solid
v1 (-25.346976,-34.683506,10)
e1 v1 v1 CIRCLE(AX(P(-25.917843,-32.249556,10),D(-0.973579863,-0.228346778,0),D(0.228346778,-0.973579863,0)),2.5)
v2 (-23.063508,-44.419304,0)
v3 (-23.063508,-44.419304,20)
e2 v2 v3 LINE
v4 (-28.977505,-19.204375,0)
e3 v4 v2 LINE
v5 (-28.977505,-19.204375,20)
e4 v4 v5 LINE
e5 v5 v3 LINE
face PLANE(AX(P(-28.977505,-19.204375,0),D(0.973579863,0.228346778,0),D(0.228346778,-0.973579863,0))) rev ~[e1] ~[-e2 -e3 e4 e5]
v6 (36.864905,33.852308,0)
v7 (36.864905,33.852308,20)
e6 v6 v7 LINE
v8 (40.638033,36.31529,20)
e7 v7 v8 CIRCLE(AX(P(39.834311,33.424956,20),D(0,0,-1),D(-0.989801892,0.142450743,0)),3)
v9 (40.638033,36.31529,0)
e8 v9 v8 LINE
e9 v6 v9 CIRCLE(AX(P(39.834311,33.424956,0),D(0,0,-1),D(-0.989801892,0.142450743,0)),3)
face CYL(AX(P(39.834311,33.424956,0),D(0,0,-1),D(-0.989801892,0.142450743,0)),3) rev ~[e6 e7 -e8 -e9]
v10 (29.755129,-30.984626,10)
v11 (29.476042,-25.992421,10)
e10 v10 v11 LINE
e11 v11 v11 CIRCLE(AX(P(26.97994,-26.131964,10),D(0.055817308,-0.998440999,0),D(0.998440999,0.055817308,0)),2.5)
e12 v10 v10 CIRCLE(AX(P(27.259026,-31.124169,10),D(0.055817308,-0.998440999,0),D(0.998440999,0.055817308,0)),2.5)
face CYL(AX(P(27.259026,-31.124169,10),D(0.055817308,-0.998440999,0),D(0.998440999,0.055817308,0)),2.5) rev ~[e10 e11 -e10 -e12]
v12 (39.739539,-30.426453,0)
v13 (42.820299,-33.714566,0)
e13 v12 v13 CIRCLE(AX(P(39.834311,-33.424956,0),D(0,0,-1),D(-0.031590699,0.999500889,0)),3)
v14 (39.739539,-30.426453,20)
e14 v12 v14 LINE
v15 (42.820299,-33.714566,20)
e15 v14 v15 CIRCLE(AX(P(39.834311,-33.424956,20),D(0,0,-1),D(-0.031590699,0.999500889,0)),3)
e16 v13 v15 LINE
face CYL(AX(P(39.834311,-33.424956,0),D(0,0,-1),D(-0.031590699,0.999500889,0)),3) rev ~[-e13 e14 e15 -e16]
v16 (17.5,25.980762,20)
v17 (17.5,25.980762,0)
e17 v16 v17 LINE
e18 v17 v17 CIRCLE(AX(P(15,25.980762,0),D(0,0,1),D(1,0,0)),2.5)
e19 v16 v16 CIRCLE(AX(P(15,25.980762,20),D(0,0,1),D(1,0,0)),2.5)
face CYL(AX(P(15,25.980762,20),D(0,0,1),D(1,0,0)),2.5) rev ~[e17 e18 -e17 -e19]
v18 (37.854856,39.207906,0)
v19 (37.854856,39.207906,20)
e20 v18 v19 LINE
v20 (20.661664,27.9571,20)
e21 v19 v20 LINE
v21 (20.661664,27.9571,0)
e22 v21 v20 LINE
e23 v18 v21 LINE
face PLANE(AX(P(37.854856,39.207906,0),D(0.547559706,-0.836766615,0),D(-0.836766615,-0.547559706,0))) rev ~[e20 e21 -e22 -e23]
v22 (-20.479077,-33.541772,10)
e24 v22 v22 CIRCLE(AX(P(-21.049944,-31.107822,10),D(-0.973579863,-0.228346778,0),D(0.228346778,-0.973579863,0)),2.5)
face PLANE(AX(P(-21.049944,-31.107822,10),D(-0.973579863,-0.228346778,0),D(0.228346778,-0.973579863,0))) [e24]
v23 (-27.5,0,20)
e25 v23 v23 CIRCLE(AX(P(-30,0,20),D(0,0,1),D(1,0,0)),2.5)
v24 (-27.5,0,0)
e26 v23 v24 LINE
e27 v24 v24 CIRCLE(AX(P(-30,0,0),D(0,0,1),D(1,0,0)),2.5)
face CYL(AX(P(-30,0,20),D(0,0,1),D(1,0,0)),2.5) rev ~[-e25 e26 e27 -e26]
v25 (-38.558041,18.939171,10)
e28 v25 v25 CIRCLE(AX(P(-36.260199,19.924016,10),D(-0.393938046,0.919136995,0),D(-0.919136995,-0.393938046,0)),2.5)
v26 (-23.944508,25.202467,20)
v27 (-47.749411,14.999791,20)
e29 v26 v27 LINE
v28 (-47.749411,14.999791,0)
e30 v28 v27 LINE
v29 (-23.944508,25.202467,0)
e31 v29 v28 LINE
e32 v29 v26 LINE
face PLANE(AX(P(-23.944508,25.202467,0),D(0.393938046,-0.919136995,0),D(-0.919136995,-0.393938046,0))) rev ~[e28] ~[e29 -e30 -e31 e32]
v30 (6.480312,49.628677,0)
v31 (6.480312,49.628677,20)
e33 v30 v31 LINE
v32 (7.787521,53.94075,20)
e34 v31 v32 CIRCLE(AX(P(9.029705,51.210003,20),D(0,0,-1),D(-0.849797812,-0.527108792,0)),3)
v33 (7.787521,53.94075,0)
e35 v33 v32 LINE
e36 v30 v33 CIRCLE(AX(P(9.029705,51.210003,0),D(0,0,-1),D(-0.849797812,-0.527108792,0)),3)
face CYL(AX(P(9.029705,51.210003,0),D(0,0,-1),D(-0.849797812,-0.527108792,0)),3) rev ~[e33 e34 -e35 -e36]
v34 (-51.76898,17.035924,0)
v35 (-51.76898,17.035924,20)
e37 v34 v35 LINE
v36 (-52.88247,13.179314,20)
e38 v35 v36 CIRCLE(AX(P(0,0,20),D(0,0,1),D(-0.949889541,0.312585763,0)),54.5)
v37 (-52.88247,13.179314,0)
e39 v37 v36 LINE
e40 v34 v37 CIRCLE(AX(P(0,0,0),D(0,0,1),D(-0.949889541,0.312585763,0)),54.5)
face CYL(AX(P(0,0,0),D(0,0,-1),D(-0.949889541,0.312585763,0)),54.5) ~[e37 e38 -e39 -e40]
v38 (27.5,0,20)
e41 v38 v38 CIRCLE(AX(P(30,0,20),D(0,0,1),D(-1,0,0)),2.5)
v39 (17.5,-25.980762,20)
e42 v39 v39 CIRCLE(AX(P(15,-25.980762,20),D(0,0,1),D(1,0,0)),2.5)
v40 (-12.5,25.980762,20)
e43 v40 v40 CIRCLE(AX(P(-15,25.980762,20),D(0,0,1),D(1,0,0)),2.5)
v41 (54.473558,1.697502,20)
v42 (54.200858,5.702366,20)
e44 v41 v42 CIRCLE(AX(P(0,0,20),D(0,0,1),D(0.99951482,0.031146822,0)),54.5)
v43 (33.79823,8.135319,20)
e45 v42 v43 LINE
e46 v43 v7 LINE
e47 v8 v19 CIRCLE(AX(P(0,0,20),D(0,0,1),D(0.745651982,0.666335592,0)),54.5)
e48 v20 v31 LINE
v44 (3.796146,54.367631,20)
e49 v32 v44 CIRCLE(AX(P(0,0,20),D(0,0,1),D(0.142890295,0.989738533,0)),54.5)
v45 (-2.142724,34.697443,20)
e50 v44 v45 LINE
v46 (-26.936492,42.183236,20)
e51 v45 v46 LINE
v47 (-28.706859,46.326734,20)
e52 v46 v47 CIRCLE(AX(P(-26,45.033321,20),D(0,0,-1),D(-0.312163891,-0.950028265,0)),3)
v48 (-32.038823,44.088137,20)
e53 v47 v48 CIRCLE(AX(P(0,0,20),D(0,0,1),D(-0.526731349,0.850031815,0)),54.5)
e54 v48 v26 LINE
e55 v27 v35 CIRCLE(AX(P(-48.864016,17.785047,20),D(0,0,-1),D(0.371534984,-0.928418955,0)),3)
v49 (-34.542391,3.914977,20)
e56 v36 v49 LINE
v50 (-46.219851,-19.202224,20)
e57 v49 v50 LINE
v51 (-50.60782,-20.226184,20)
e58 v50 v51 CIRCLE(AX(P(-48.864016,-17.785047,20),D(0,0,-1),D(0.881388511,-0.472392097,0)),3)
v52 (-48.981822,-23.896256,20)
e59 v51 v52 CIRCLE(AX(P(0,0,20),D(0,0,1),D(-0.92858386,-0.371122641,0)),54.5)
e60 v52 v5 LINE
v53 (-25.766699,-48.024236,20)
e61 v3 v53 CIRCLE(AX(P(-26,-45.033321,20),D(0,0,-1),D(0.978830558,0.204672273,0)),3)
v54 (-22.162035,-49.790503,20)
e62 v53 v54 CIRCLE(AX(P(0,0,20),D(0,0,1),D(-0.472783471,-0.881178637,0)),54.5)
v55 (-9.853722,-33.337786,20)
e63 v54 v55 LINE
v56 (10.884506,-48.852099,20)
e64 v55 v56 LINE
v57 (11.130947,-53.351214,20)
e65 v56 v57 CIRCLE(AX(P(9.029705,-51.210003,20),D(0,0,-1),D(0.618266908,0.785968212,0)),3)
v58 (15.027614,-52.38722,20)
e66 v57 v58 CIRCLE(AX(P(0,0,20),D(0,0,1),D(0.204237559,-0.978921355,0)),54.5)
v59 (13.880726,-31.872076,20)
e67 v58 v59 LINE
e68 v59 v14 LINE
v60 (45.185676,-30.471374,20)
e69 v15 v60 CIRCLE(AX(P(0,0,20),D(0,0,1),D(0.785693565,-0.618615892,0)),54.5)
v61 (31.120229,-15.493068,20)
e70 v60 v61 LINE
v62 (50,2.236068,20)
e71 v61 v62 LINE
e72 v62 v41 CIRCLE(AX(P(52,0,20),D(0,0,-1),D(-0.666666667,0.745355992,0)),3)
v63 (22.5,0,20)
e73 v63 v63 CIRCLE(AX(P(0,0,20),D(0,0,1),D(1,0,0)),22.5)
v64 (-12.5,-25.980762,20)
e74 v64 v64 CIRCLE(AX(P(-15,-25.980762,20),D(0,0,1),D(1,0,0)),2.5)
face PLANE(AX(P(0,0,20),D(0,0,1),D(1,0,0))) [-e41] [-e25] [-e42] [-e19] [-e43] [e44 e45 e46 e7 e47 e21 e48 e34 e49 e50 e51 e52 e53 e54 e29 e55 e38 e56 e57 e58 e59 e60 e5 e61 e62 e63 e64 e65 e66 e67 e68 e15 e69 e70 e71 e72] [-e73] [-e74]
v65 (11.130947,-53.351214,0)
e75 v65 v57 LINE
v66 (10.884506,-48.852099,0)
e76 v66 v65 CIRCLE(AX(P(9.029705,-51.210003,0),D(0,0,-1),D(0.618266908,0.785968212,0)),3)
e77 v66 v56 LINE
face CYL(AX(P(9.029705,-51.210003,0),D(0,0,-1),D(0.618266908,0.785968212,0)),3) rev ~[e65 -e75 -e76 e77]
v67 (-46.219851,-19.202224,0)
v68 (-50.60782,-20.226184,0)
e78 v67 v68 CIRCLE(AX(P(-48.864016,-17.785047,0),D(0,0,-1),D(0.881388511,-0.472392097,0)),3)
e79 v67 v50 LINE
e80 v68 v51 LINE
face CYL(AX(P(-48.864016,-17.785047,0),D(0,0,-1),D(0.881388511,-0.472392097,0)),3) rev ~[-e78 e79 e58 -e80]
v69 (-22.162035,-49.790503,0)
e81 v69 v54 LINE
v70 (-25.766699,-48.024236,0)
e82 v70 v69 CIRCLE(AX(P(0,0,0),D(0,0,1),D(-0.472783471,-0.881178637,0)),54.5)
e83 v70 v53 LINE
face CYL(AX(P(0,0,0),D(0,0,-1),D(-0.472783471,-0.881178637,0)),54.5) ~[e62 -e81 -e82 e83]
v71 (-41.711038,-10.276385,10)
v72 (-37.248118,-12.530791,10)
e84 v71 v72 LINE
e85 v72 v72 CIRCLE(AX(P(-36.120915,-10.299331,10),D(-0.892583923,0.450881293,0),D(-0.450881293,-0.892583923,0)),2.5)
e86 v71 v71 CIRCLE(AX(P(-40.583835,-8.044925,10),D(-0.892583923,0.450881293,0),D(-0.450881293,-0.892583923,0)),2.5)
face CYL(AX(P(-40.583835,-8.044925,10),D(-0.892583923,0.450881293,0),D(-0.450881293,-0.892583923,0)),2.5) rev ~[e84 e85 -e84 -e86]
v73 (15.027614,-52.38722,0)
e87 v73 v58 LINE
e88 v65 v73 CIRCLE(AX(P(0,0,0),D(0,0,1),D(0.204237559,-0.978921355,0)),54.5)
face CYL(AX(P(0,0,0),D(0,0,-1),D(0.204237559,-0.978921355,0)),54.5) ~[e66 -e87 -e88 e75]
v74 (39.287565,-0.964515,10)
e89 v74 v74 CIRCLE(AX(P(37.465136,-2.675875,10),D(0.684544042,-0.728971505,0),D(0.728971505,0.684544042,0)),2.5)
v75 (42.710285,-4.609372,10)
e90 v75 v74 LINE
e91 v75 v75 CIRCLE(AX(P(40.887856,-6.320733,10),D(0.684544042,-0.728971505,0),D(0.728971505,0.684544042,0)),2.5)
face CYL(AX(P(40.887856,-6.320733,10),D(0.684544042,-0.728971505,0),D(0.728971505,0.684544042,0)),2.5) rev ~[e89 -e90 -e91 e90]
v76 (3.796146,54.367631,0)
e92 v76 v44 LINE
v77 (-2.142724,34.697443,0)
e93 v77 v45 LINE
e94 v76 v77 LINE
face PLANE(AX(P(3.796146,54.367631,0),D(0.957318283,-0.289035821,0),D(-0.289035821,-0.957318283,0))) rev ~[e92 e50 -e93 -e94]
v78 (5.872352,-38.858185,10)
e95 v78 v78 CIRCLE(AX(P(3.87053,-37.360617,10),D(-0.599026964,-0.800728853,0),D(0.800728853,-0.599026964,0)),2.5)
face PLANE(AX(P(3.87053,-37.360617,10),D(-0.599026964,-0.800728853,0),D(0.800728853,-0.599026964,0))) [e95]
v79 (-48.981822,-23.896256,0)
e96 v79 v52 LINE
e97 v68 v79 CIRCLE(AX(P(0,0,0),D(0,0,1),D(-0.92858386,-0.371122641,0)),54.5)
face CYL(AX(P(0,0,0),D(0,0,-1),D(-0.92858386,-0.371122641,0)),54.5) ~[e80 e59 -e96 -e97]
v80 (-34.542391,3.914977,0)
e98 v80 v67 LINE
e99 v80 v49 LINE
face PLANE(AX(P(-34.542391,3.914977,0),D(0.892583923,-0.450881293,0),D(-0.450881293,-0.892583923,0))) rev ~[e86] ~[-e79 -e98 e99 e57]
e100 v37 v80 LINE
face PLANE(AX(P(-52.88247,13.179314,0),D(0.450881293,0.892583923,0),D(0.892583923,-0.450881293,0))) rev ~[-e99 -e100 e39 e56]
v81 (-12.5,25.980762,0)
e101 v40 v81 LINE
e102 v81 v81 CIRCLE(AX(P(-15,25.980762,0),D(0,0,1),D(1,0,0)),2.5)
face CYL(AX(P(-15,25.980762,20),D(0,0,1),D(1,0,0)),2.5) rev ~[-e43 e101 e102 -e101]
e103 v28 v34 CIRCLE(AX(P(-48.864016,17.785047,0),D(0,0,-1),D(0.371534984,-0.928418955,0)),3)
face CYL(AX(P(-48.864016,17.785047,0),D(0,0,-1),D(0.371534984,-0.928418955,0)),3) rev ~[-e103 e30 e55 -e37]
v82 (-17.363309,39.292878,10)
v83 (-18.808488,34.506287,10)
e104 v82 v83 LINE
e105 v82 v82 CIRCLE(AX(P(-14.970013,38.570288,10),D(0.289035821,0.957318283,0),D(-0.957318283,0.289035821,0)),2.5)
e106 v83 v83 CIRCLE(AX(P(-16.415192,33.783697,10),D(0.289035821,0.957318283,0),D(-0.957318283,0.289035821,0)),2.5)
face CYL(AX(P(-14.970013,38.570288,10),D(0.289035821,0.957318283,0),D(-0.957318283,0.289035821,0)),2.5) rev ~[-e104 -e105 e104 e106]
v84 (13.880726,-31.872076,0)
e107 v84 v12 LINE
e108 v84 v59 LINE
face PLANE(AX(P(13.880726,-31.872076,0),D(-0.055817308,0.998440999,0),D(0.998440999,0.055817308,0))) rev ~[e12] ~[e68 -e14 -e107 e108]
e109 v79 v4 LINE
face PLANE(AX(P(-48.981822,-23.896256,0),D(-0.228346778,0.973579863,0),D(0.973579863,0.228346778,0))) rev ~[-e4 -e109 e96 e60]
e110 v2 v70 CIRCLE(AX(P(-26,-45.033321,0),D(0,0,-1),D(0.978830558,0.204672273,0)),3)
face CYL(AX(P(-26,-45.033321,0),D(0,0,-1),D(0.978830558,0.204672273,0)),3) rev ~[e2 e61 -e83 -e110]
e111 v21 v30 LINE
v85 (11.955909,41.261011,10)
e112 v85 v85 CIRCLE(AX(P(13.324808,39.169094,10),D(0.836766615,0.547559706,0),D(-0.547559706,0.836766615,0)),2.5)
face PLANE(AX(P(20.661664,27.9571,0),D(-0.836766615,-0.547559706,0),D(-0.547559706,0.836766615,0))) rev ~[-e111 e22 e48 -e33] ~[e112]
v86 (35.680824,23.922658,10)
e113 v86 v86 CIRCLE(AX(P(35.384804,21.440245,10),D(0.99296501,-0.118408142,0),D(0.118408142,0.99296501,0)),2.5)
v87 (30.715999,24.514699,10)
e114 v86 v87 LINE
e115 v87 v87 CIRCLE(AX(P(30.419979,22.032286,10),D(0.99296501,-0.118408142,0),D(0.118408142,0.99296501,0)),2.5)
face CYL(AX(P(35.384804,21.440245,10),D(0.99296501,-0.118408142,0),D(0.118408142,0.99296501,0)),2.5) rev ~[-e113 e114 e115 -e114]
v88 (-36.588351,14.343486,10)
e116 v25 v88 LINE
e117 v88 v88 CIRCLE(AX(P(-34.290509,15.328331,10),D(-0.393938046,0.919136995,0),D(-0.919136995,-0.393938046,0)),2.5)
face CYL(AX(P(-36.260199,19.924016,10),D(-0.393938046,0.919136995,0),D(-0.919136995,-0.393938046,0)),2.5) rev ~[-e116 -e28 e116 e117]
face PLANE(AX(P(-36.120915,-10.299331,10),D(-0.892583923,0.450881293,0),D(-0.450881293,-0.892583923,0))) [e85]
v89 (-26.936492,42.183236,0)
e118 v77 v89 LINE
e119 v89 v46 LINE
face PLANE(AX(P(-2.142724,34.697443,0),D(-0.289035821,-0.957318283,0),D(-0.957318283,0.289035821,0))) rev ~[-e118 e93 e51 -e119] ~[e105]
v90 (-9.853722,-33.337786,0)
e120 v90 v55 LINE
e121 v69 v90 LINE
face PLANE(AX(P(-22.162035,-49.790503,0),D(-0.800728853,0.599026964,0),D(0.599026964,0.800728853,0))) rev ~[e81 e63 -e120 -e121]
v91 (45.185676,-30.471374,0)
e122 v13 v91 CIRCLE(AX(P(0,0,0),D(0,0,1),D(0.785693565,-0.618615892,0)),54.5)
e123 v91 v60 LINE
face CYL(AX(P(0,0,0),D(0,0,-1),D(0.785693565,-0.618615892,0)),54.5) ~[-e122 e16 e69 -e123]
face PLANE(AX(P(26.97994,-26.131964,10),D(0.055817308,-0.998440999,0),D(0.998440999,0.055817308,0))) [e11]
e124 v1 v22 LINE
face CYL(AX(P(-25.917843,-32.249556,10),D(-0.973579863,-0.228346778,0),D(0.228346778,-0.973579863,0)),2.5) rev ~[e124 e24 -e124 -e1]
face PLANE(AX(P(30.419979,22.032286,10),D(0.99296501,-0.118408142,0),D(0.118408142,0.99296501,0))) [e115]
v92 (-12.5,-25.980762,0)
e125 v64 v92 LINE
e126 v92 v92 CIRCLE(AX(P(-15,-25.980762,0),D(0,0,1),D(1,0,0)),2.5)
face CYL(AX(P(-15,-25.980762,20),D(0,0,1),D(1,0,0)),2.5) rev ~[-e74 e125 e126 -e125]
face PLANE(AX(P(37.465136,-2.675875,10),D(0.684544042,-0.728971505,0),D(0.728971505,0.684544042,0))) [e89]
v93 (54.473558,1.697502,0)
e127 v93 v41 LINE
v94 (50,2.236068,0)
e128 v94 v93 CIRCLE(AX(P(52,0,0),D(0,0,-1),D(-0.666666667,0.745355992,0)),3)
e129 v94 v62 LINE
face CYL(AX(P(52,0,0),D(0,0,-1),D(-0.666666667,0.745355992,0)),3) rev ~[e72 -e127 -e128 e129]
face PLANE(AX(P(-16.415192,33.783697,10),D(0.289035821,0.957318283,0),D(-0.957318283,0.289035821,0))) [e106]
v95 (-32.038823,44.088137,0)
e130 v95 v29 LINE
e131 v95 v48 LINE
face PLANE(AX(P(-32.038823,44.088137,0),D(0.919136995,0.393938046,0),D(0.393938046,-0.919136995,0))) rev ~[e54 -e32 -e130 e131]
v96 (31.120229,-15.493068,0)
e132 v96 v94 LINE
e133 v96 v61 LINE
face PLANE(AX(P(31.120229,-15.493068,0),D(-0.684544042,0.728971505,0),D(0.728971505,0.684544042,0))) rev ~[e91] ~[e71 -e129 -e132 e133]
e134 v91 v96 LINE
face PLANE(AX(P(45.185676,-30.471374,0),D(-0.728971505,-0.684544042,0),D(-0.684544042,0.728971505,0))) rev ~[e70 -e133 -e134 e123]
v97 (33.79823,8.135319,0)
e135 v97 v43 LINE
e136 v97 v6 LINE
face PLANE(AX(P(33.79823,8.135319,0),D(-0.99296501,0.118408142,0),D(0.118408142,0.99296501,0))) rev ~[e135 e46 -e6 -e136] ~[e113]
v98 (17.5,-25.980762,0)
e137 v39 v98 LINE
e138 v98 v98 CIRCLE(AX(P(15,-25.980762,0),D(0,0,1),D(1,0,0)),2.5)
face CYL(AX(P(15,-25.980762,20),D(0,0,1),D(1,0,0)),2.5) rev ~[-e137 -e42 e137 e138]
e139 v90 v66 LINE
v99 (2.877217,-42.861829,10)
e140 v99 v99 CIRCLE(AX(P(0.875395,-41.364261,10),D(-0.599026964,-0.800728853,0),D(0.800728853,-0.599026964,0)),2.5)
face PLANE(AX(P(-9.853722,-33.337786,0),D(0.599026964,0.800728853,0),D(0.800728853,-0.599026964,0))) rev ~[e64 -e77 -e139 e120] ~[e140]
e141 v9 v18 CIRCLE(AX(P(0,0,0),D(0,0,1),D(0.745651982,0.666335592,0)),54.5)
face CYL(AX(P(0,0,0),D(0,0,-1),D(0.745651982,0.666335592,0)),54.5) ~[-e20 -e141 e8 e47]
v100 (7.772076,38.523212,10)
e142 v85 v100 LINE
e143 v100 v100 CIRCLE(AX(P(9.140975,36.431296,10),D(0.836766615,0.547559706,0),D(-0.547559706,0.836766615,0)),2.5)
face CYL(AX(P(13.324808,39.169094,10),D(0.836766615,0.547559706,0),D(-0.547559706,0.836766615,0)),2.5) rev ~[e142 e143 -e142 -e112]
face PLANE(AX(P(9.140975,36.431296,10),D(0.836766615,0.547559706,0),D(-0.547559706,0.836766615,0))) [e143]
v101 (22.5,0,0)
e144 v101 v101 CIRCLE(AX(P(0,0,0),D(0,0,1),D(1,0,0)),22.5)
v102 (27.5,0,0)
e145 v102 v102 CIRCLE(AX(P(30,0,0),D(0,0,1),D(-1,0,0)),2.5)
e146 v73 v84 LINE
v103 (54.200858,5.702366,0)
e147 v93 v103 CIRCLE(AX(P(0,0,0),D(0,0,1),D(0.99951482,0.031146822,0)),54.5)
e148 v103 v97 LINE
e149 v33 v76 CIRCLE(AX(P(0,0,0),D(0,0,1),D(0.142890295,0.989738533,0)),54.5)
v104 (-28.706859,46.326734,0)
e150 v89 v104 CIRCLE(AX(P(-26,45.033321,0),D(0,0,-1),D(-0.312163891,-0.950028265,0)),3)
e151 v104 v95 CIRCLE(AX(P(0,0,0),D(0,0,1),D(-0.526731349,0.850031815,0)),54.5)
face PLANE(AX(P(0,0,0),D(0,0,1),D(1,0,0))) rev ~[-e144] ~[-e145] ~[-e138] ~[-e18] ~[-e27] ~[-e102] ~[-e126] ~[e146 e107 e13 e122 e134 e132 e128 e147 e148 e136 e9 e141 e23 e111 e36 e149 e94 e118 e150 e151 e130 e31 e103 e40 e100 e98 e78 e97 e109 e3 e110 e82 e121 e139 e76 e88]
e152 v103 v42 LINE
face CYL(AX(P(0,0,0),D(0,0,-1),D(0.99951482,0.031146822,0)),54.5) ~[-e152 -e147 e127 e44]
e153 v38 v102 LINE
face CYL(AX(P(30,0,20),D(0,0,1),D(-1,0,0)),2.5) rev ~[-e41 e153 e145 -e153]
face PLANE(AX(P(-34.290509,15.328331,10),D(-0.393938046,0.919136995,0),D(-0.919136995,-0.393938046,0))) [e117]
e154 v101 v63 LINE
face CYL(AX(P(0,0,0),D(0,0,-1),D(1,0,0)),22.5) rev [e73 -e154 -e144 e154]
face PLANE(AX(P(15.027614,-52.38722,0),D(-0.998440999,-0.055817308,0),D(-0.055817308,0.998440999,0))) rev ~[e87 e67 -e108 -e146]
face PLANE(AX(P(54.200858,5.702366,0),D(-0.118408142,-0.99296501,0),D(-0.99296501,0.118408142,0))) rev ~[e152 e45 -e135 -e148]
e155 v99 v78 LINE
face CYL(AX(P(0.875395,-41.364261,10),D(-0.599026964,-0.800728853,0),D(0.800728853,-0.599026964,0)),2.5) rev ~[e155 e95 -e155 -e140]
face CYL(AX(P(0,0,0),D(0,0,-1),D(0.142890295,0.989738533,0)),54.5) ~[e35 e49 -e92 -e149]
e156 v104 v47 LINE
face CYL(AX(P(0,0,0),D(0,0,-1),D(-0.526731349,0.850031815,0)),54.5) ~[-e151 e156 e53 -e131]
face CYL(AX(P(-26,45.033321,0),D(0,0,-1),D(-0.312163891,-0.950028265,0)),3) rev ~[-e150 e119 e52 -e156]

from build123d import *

# Parameters (mm, degrees)
F0_R      = 22.5
F1_DEPTH  = 20
F2_R      = 2.5
F3_DEPTH  = 20.001
F4_R      = 2.5
F5_DEPTH  = 5
F6_R      = 2.5
F7_DEPTH  = 5
F8_R      = 2.5
F9_DEPTH  = 5
F10_R     = 2.5
F11_DEPTH = 5
F12_R     = 2.5
F13_DEPTH = 5
F14_R     = 2.5
F15_DEPTH = 5
F16_R     = 2.5
F17_DEPTH = 5
F18_R     = 2.5
F19_DEPTH = 5
F20_R     = 2.5
F21_DEPTH = 5


# Not quite as in the source:
# - a feature names something its author has since deleted; it is built from what else it names


with BuildPart() as f1:
    # F0 (on Top) → F1 (new body)
    with BuildSketch(Plane.XY):
        with BuildLine():
            ThreePointArc((50, 2.2360679775), (52.3585771958, 2.9784933095), (54.4735576923, 1.6975017946))
            ThreePointArc((54.4735576923, 1.6975017946), (54.3740921627, 3.7024453378), (54.2008581475, 5.7023658309))
            Line((54.2008581475, 5.7023658309), (33.7982304406, 8.1353188741))
            Line((33.7982304406, 8.1353188741), (36.8649053656, 33.8523079329))
            ThreePointArc((36.8649053656, 33.8523079329), (38.1944585155, 35.9371029308), (40.6380330461, 36.3152897571))
            ThreePointArc((40.6380330461, 36.3152897571), (39.2730851622, 37.7872304071), (37.8548560942, 39.207905709))
            Line((37.8548560942, 39.207905709), (20.6616644432, 27.9570995731))
            Line((20.6616644432, 27.9570995731), (6.4803118028, 49.62867678))
            ThreePointArc((6.4803118028, 49.62867678), (6.1587282118, 52.0803426945), (7.7875210962, 53.9407500428))
            ThreePointArc((7.7875210962, 53.9407500428), (5.7957651426, 54.1909504107), (3.7961461645, 54.3676307585))
            Line((3.7961461645, 54.3676307585), (-2.1427239761, 34.6974426733))
            Line((-2.1427239761, 34.6974426733), (-26.9364916731, 42.1832362005))
            ThreePointArc((-26.9364916731, 42.1832362005), (-28.7587394689, 43.8546113028), (-28.7068585233, 46.3267338987))
            ThreePointArc((-28.7068585233, 46.3267338987), (-30.3934578, 45.2381224517), (-32.038822745, 44.0881371472))
            Line((-32.038822745, 44.0881371472), (-23.9445080332, 25.2024667275))
            Line((-23.9445080332, 25.2024667275), (-47.7494113294, 14.9997905883))
            ThreePointArc((-47.7494113294, 14.9997905883), (-50.2196733343, 15.1088198928), (-51.7689799985, 17.0359240992))
            ThreePointArc((-51.7689799985, 17.0359240992), (-52.3612440523, 15.1178742319), (-52.8824704203, 13.1793141796))
            Line((-52.8824704203, 13.1793141796), (-34.542390668, 3.9149765057))
            Line((-34.542390668, 3.9149765057), (-46.2198507491, -19.2022237443))
            ThreePointArc((-46.2198507491, -19.2022237443), (-48.1822639171, -20.7065562608), (-50.6078203843, -20.2261839196))
            ThreePointArc((-50.6078203843, -20.2261839196), (-49.8286222822, -22.0761953575), (-48.9818224627, -23.8962563644))
            Line((-48.9818224627, -23.8962563644), (-28.9775048134, -19.2043747332))
            Line((-28.9775048134, -19.2043747332), (-23.0635083269, -44.419304178))
            ThreePointArc((-23.0635083269, -44.419304178), (-23.5998377269, -46.8331046123), (-25.766699169, -48.0242356934))
            ThreePointArc((-25.766699169, -48.0242356934), (-23.9806343627, -48.9405677895), (-22.1620354025, -49.7905029782))
            Line((-22.1620354025, -49.7905029782), (-9.8537224074, -33.3377856016))
            Line((-9.8537224074, -33.3377856016), (10.8845059639, -48.8520985212))
            ThreePointArc((10.8845059639, -48.8520985212), (12.0252148188, -51.0459228237), (11.1309469524, -53.3512138563))
            ThreePointArc((11.1309469524, -53.3512138563), (13.0881588901, -52.905104639), (15.0276143261, -52.3872198887))
            Line((15.0276143261, -52.3872198887), (13.8807262249, -31.8720760788))
            Line((13.8807262249, -31.8720760788), (39.7395389463, -30.4264530357))
            ThreePointArc((39.7395389463, -30.4264530357), (42.0235357053, -31.3737864336), (42.8202992881, -33.7145661232))
            ThreePointArc((42.8202992881, -33.7145661232), (44.0328571396, -32.1147550532), (45.1856762982, -30.4713743942))
            Line((45.1856762982, -30.4713743942), (31.1202287894, -15.49306794))
            Line((31.1202287894, -15.49306794), (50, 2.2360679775))
        make_face()
        Circle(F0_R, mode=Mode.SUBTRACT)
    extrude(amount=F1_DEPTH)

    # F2 (on face) → F3 (cut, through all)
    with BuildSketch(Plane.XY.offset(20)):
        with Locations((15, 25.9807621135)):
            Circle(F2_R)
        with BuildLine():
            ThreePointArc((32.5, 0), (30, 2.5), (27.5, 0))
            ThreePointArc((27.5, 0), (30, -2.5), (32.5, 0))
        make_face()
        with Locations((15, -25.9807621135)):
            Circle(F2_R)
        with Locations((-15, -25.9807621135)):
            Circle(F2_R)
        with Locations((-30, 0)):
            Circle(F2_R)
        with Locations((-15, 25.9807621135)):
            Circle(F2_R)
    extrude(amount=-F3_DEPTH, mode=Mode.SUBTRACT)

    # F4 (on face) → F5 (cut)
    with BuildSketch(Plane(origin=(32.3678514777, -3.8597706083, 0), x_dir=(0.1184081423, 0.9929650104, 0), z_dir=(0.9929650104, -0.1184081423, 0))):
        with Locations((25.4792622567, 10)):
            Circle(F4_R)
    extrude(amount=-F5_DEPTH, mode=Mode.SUBTRACT)

    # F6 (on face) → F7 (cut)
    with BuildSketch(Plane(origin=(27.2762254834, 17.8488980559, 0), x_dir=(-0.5475597061, 0.8367666151, 0), z_dir=(0.8367666151, 0.5475597061, 0))):
        with Locations((25.4792622567, 10)):
            Circle(F6_R)
    extrude(amount=-F7_DEPTH, mode=Mode.SUBTRACT)

    # F8 (on face) → F9 (cut)
    with BuildSketch(Plane(origin=(9.421750444, 31.2058689513, 0), x_dir=(-0.9573182826, 0.289035821, 0), z_dir=(0.289035821, 0.9573182826, 0))):
        with Locations((25.4792622567, 10)):
            Circle(F8_R)
    extrude(amount=-F9_DEPTH, mode=Mode.SUBTRACT)

    # F10 (on face) → F11 (cut)
    with BuildSketch(Plane(origin=(-12.8412663393, 29.9612669498, 0), x_dir=(-0.9191369952, -0.393938046, 0), z_dir=(-0.393938046, 0.9191369952, 0))):
        with Locations((25.4792622567, 10)):
            Circle(F10_R)
    extrude(amount=-F11_DEPTH, mode=Mode.SUBTRACT)

    # F12 (on face) → F13 (cut)
    with BuildSketch(Plane(origin=(-29.0957118877, 14.6974551601, 0), x_dir=(-0.4508812927, -0.8925839232, 0), z_dir=(-0.8925839232, 0.4508812927, 0))):
        with Locations((25.4792622567, 10)):
            Circle(F12_R)
    extrude(amount=-F13_DEPTH, mode=Mode.SUBTRACT)

    # F14 (on face) → F15 (cut)
    with BuildSketch(Plane(origin=(-31.735950481, -7.4434592431, 0), x_dir=(0.2283467777, -0.9735798627, 0), z_dir=(-0.9735798627, -0.2283467777, 0))):
        with Locations((25.4792622567, 10)):
            Circle(F14_R)
    extrude(amount=-F15_DEPTH, mode=Mode.SUBTRACT)

    # F16 (on face) → F17 (cut)
    with BuildSketch(Plane(origin=(-19.5265851384, -26.1014963415, 0), x_dir=(0.8007288529, -0.5990269644, 0), z_dir=(-0.5990269644, -0.8007288529, 0))):
        with Locations((25.4792622567, 10)):
            Circle(F16_R)
    extrude(amount=-F17_DEPTH, mode=Mode.SUBTRACT)

    # F18 (on face) → F19 (cut)
    with BuildSketch(Plane(origin=(1.8194864043, -32.546353216, 0), x_dir=(0.9984409988, 0.055817308, 0), z_dir=(0.055817308, -0.9984409988, 0))):
        with Locations((25.4792622567, 10)):
            Circle(F18_R)
    extrude(amount=-F19_DEPTH, mode=Mode.SUBTRACT)

    # F20 (on face) → F21 (cut)
    with BuildSketch(Plane(origin=(22.314200037, -23.7624097082, 0), x_dir=(0.7289715049, 0.6845440417, 0), z_dir=(0.6845440417, -0.7289715049, 0))):
        with Locations((25.4792622567, 10)):
            Circle(F20_R)
    extrude(amount=-F21_DEPTH, mode=Mode.SUBTRACT)


solid = f1.part
